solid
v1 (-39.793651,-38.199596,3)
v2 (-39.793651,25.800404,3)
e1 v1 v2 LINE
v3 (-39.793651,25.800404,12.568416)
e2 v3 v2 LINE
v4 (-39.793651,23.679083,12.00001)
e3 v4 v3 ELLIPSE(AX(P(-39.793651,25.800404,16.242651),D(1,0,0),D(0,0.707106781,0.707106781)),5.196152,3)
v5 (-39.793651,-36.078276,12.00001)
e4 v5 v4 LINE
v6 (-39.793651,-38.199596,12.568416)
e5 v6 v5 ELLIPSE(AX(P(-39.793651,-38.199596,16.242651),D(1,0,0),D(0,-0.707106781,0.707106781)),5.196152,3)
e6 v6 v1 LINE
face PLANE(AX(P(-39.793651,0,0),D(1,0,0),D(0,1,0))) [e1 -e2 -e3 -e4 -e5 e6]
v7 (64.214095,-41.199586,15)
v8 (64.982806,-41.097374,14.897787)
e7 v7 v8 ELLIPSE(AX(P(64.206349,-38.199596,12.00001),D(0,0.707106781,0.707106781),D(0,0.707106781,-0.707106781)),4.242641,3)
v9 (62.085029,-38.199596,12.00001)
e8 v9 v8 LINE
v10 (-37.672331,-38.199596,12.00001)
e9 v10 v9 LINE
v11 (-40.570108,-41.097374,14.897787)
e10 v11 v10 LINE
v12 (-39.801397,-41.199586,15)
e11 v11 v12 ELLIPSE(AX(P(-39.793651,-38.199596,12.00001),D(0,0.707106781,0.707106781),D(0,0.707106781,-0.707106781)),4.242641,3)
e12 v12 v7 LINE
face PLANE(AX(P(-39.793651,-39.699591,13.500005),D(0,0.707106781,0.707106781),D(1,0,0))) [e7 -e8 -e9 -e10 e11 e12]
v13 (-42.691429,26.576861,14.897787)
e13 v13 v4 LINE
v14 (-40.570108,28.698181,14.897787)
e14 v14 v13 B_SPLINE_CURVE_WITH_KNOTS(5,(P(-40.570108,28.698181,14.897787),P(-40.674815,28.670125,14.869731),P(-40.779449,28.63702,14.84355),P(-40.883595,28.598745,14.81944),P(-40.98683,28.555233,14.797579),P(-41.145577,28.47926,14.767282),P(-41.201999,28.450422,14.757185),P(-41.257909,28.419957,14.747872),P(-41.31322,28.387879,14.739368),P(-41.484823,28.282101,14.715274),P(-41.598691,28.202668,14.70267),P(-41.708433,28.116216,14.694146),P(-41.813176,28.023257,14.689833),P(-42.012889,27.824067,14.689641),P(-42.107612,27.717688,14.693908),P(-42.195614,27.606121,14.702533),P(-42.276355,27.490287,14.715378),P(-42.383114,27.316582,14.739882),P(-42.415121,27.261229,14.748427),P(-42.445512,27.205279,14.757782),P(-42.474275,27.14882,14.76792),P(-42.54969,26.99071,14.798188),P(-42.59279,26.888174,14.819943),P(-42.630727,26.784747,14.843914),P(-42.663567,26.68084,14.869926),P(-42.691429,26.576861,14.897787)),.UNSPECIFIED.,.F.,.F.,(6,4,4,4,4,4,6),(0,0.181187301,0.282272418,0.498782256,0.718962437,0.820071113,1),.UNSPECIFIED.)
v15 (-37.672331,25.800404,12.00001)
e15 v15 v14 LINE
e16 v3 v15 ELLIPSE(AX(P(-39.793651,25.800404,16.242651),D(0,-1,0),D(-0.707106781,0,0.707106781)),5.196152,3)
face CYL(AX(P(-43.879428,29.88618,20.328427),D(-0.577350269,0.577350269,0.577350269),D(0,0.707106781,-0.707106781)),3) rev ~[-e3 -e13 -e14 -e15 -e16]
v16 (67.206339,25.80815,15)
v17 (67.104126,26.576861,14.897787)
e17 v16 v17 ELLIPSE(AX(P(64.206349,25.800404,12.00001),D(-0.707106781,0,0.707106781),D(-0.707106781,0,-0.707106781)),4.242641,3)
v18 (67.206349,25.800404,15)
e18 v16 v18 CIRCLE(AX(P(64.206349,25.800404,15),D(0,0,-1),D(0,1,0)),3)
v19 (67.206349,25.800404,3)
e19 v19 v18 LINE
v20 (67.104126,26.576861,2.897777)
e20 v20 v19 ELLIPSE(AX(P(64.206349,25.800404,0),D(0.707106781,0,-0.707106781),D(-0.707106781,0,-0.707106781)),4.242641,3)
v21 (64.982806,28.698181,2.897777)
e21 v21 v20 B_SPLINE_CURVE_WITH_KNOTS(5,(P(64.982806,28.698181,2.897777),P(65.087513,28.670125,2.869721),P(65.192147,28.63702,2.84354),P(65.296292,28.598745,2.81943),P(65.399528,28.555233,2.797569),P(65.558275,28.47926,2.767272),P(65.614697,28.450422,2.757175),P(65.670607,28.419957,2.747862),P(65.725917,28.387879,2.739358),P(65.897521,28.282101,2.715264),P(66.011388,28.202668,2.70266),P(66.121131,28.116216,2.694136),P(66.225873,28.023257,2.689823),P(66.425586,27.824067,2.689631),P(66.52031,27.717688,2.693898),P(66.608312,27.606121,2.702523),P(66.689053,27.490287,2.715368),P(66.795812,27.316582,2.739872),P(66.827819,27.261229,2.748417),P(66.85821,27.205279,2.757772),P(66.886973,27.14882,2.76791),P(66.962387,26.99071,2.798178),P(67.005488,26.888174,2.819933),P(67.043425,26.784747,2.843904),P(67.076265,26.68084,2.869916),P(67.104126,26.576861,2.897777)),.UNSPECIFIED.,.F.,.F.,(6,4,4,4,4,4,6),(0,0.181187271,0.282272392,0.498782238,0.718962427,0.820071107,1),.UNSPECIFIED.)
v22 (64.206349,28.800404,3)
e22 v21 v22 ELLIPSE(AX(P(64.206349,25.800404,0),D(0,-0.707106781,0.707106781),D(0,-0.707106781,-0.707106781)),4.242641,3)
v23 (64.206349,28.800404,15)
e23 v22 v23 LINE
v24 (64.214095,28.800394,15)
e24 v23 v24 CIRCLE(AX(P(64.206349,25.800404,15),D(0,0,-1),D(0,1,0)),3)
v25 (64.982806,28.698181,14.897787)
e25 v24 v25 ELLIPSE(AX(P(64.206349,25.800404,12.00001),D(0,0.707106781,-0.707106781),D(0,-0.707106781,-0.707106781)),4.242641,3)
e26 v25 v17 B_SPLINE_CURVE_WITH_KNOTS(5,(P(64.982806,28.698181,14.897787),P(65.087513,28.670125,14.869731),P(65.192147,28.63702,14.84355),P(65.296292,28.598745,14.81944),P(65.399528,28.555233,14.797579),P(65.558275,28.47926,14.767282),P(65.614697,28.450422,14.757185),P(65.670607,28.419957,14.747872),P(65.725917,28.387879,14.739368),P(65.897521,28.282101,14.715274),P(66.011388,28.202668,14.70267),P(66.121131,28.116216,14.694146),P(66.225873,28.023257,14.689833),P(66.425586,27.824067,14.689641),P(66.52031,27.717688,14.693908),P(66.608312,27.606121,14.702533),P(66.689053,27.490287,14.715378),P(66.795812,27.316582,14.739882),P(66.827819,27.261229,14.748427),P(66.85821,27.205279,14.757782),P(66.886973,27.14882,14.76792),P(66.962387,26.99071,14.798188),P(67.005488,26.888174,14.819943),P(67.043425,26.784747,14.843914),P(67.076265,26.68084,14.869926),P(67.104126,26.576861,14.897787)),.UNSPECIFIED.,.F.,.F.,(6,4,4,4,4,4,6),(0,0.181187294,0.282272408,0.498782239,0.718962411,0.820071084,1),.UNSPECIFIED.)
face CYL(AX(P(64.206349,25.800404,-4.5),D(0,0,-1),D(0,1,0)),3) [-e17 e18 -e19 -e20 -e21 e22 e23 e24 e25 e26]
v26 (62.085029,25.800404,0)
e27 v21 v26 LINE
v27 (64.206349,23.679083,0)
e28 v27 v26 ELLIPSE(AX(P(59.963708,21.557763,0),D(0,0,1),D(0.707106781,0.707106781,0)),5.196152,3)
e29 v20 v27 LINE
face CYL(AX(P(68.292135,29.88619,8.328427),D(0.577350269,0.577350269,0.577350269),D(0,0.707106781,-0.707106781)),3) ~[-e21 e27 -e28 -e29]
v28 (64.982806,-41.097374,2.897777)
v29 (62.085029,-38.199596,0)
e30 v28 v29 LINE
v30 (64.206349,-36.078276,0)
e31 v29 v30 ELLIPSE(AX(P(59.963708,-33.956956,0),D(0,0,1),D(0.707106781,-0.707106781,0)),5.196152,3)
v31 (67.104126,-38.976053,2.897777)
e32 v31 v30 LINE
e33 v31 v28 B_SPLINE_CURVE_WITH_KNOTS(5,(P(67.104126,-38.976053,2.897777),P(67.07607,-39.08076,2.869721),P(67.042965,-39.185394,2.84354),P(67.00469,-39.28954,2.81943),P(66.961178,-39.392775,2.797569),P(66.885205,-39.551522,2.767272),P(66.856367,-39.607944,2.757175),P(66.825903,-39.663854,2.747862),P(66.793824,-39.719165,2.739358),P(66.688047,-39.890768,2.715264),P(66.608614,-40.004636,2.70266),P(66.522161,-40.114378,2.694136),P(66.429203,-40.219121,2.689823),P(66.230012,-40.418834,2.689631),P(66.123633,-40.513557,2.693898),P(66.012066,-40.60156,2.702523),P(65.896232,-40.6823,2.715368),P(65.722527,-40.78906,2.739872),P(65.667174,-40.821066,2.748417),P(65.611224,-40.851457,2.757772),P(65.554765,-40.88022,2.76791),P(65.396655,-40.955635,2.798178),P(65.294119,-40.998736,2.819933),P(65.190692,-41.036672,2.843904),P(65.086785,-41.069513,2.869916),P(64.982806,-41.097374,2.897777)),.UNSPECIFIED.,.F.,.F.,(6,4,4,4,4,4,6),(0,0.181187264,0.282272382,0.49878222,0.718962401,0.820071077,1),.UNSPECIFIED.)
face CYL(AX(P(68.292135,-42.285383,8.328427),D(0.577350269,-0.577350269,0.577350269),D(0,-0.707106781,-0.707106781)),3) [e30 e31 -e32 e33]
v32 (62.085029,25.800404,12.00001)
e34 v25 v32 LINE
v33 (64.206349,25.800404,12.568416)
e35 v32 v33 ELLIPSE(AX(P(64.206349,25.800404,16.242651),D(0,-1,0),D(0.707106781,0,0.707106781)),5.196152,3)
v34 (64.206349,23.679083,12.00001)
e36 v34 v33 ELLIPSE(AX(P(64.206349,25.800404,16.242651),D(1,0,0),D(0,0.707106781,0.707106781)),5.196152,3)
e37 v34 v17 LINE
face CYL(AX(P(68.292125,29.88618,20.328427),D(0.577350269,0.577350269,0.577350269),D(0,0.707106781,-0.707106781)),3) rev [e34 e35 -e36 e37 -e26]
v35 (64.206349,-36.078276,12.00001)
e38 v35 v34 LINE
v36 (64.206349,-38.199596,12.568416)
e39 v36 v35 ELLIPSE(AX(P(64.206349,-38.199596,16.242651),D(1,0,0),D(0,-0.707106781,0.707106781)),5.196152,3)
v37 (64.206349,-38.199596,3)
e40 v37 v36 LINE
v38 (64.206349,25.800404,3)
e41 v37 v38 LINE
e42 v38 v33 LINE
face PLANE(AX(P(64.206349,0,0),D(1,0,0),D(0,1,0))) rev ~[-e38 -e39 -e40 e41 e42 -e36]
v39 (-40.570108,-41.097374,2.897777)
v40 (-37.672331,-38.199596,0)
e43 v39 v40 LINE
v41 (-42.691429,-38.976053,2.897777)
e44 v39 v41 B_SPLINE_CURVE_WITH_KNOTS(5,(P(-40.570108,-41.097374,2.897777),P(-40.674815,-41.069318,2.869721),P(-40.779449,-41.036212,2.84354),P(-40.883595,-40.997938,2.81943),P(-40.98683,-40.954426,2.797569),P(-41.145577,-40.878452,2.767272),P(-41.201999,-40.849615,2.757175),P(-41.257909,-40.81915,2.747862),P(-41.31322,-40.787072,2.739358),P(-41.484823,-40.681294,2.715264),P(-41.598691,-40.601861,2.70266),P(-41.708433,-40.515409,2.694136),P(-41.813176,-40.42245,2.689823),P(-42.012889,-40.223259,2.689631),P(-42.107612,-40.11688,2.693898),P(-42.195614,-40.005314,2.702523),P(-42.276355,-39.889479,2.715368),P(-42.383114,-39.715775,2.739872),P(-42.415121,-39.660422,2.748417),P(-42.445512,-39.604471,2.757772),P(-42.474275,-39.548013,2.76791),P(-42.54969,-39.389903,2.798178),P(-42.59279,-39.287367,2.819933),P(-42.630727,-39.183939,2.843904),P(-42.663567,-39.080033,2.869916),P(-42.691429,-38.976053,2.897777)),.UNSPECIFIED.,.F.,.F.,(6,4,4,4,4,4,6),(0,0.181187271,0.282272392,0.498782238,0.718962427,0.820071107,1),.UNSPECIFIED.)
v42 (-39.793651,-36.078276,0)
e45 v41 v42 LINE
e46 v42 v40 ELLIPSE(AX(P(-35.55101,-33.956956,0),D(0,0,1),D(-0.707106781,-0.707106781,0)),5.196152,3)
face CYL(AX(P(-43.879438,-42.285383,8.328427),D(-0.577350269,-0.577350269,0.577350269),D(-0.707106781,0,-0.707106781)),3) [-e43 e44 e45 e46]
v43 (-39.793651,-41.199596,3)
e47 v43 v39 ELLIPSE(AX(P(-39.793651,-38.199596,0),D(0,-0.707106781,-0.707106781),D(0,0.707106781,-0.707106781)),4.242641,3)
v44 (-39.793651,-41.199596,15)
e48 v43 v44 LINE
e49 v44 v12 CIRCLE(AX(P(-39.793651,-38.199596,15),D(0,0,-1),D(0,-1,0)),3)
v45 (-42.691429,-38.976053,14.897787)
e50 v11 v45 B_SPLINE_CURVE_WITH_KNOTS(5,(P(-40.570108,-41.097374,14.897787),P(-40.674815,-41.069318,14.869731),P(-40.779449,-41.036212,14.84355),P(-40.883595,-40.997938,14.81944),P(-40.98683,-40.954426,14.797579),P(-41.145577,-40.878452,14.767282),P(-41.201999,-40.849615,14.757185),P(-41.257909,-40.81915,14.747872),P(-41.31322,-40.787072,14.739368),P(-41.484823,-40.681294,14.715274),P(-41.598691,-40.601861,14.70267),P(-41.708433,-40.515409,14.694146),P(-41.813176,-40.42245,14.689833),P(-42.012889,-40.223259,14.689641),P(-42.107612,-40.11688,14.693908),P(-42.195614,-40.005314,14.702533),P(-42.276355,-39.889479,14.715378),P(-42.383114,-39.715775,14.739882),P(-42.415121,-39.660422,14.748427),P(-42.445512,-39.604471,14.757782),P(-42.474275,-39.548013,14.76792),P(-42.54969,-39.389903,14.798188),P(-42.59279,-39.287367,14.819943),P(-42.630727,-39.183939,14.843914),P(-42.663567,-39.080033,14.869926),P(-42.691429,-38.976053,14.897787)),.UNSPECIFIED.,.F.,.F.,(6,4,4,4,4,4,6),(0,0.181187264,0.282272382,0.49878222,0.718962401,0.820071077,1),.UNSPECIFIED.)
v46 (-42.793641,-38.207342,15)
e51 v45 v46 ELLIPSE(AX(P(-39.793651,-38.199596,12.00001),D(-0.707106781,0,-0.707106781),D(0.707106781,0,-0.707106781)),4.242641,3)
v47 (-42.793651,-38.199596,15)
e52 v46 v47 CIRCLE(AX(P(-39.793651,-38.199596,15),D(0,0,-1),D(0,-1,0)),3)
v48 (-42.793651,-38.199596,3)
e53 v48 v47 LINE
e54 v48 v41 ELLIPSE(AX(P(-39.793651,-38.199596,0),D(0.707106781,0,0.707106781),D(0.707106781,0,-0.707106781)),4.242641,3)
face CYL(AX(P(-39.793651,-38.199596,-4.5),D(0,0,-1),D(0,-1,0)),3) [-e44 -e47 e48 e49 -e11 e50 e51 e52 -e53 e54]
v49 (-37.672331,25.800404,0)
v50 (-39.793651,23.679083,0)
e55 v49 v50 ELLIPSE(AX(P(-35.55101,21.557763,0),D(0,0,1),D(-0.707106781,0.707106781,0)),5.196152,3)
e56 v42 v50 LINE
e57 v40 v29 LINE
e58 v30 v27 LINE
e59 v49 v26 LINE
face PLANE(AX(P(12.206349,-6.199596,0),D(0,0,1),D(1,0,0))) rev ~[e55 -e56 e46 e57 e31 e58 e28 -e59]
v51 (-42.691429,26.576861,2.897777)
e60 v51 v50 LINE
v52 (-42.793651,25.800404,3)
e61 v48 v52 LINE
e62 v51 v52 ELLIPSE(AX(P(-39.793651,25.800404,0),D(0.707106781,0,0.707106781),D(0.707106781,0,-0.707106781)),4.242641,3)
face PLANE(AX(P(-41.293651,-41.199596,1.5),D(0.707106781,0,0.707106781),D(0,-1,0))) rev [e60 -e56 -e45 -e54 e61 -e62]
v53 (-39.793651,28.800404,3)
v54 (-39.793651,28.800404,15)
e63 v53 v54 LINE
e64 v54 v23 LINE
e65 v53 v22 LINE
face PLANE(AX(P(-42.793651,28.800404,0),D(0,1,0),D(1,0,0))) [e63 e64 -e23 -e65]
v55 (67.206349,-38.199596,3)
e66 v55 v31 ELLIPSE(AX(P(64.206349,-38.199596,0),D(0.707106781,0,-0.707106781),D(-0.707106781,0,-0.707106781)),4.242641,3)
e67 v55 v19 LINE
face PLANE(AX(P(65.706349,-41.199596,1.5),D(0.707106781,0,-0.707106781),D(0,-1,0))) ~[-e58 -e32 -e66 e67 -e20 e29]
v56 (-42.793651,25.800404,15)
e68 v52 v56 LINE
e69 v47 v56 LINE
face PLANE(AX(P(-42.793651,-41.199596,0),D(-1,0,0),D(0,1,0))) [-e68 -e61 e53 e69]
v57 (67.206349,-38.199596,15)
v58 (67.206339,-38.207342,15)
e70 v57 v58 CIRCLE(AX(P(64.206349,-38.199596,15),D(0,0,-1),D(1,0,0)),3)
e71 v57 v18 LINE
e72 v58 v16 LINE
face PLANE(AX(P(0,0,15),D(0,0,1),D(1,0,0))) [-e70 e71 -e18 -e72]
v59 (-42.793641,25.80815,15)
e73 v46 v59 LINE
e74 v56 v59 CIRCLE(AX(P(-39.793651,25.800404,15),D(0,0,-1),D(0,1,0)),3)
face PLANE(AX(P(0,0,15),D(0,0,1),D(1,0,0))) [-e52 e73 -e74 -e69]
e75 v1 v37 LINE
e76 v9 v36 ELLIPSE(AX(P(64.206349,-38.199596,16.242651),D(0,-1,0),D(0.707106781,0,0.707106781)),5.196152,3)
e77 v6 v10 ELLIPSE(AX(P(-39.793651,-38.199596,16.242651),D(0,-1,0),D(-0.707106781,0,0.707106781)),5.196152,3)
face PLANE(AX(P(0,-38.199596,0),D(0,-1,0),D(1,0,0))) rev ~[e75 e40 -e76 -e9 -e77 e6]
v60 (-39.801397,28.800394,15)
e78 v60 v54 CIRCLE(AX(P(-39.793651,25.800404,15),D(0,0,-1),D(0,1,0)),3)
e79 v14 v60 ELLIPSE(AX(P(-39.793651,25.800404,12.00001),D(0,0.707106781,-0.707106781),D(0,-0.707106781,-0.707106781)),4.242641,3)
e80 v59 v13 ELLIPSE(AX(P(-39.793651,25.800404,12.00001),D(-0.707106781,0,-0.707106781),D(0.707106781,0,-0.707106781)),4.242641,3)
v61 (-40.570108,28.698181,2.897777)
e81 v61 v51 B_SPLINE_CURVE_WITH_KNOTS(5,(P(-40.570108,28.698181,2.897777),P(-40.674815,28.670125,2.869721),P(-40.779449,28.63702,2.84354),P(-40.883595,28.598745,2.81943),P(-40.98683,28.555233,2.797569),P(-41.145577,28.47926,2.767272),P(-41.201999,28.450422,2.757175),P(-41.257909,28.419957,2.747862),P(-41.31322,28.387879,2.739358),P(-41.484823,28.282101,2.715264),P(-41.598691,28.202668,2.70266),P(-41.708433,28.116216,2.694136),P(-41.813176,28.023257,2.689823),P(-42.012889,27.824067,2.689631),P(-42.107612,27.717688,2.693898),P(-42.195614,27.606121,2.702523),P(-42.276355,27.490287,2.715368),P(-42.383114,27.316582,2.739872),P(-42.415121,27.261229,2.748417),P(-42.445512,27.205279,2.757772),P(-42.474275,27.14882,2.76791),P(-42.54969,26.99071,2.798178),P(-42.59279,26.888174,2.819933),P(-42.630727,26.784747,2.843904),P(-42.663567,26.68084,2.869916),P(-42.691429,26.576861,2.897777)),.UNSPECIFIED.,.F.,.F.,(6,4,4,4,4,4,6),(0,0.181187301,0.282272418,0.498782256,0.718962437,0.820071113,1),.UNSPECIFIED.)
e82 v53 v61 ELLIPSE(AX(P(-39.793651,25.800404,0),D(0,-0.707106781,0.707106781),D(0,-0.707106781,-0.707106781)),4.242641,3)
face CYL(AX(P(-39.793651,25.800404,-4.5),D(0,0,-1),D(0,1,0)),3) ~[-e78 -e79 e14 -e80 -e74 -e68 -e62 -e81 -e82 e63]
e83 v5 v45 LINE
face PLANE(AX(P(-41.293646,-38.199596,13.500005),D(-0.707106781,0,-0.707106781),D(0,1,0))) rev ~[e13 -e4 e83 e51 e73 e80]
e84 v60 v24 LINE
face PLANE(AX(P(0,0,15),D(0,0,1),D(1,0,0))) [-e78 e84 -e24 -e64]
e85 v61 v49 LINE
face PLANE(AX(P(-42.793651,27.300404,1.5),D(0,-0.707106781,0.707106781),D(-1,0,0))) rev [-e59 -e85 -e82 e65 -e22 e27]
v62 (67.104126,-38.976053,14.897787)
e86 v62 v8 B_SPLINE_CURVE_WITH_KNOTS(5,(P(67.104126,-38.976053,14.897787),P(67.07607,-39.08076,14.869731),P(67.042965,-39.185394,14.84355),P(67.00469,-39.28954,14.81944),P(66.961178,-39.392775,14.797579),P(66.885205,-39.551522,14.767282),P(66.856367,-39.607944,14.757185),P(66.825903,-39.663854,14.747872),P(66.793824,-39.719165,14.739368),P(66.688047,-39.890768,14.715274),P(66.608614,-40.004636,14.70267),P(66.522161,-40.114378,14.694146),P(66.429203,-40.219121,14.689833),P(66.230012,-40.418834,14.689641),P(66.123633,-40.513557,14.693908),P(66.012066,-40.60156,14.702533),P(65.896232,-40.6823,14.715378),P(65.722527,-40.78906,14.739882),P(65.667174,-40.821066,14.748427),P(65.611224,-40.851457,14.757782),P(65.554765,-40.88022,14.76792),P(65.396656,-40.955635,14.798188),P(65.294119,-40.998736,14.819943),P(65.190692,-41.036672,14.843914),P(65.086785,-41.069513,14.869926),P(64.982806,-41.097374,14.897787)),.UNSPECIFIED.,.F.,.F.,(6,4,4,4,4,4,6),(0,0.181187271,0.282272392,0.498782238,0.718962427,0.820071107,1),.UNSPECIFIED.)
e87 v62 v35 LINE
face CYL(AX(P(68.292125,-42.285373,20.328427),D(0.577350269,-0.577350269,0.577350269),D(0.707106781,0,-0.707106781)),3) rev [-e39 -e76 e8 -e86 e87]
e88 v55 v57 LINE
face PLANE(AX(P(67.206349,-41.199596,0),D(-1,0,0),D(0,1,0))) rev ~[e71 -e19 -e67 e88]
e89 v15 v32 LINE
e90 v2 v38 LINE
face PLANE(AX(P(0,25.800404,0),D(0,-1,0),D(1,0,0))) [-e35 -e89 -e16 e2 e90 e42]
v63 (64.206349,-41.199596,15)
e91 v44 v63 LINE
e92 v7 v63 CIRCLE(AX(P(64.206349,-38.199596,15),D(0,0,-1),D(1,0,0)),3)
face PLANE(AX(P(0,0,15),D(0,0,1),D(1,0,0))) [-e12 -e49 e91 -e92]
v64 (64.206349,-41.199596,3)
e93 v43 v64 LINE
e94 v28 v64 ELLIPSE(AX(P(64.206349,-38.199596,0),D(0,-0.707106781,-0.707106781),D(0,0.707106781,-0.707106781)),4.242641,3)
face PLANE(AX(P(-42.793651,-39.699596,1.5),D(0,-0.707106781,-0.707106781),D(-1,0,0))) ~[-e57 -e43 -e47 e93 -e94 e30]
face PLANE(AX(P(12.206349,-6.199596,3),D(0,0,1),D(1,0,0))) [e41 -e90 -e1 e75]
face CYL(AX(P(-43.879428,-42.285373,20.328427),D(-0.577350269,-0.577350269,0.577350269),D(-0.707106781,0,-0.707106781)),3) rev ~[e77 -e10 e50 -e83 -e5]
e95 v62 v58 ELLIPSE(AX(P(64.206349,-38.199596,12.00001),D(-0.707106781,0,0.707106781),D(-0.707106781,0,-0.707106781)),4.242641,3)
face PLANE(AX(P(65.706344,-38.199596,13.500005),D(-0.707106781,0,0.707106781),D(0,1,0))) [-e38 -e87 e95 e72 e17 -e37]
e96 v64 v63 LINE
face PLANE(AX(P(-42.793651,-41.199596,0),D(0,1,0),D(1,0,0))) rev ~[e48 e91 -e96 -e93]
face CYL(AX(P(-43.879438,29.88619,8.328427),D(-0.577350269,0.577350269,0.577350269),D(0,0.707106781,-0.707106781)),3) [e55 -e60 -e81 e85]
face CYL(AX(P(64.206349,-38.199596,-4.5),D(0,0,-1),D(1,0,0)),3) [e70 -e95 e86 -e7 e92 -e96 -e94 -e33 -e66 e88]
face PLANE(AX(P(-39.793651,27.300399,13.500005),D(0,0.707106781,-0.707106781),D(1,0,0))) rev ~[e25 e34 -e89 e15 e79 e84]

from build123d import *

# Parameters (mm, degrees)
F0_W         = 110
F0_H         = 70
F1_DEPTH     = 15
F2_T         = -3
F3_SIZE      = 3
F4_SIZE      = 2.99999
F5_T4_DEPTH  = 13.85638914
F5_T11_DEPTH = 13.85638914
F5_T17_DEPTH = 13.85638914
F5_T23_DEPTH = 13.85638914
F5_T30_DEPTH = 13.85638914
F5_T36_DEPTH = 13.85638914
F5_T42_DEPTH = 13.85638914
F5_T49_DEPTH = 13.85638914
F5_T55_DEPTH = 13.85638914
F5_T61_DEPTH = 13.85638914
F5_T68_DEPTH = 13.85638914
F5_T74_DEPTH = 13.85638914
F5_T77_DEPTH = 27
F5_T79_DEPTH = 13.8564064606
F5_T81_DEPTH = 13.8564064606
F5_T83_DEPTH = 13.8564064606
F5_T85_DEPTH = 13.8564064606


# Not quite as in the source:
# - a fillet or chamfer that OpenCascade refuses, or shapes differently, is made with other operations: its cross-section is extruded or revolved along the edge and cut away or added
# - a fillet or chamfer is up to 0.001 mm smaller than in the source, because OpenCascade refuses the exact size


with BuildPart() as f1:
    # F0 (on Top) → F1 (new body)
    with BuildSketch(Plane.XY):
        with Locations((12.2063489258, -6.1995962761)):
            Rectangle(F0_W, F0_H)
    extrude(amount=F1_DEPTH)

    # F2
    f2_openings = [f1.faces().sort_by_distance(p)[0] for p in [
        (12.206349, -6.199596, 15),
    ]]
    offset(amount=F2_T, openings=f2_openings)

    # F3
    f3_edges = [f1.edges().sort_by_distance(p)[0] for p in [
        (-42.793651, -6.199596, 0),
        (12.206349, -41.199596, 0),
        (67.206349, -6.199596, 0),
        (12.206349, 28.800404, 0),
    ]]
    chamfer(f3_edges, length=F3_SIZE)

    # F4 (size 3 in the source; OpenCascade refuses exactly that, so slightly less here)
    f4_edges = [f1.edges().sort_by_distance(p)[0] for p in [
        (12.206349, 25.800404, 15),
        (-39.793651, -6.199596, 15),
        (64.206349, -6.199596, 15),
        (12.206349, -38.199596, 15),
    ]]
    chamfer(f4_edges, length=F4_SIZE)

    # F5: fillet of radius 3 on 12 edges, made by hand


with BuildPart() as f5_tool2:
    # F5_s3 → F5_t4 (new body)
    with BuildSketch(Plane(origin=(43.6353084006, -43.6353084006, 43.6353084006), x_dir=(-0.7071067812, -0.7071067812, 0), z_dir=(-0.5773502692, 0.5773502692, -0.5773502692))):
        with BuildLine():
            ThreePointArc((-19.8895511553, -31.1430595221), (-18.3895511553, -31.5449833108), (-16.8895511553, -31.1430595221))
            Line((-16.8895511553, -31.1430595221), (-18.3895511553, -32.0090849259))
            Line((-18.3895511553, -32.0090849259), (-19.8895511553, -31.1430595221))
        make_face()
    extrude(amount=F5_T4_DEPTH)

    split(bisect_by=Plane.XY.offset(15), keep=Keep.BOTTOM)

    split(bisect_by=Plane.YZ.offset(64.2063489258), keep=Keep.TOP)

    split(bisect_by=Plane.XZ.offset(38.1995962761), keep=Keep.TOP)


with BuildPart() as f1_1:
    add(f1.part)

    # F5_t1: union F5_tool2
    add(f5_tool2.part)


with BuildPart() as f5_tool9:
    # F5_s10 → F5_t11 (new body)
    with BuildSketch(Plane(origin=(43.6353084006, -43.6353084006, 43.6353084006), x_dir=(-0.7071067812, -0.7071067812, 0), z_dir=(-0.5773502692, 0.5773502692, -0.5773502692))):
        with BuildLine():
            ThreePointArc((-19.8895511553, -31.1430595221), (-18.3895511553, -31.5449833108), (-16.8895511553, -31.1430595221))
            Line((-16.8895511553, -31.1430595221), (-18.3895511553, -32.0090849259))
            Line((-18.3895511553, -32.0090849259), (-19.8895511553, -31.1430595221))
        make_face()
    extrude(amount=F5_T11_DEPTH)

    split(bisect_by=Plane.YZ.offset(64.2063489258), keep=Keep.BOTTOM)

    split(bisect_by=Plane.XZ.offset(38.1995962761), keep=Keep.TOP)


with BuildPart() as f1_2:
    add(f1_1.part)

    # F5_t8: union F5_tool9
    add(f5_tool9.part)


with BuildPart() as f5_tool15:
    # F5_s16 → F5_t17 (new body)
    with BuildSketch(Plane(origin=(43.6353084006, -43.6353084006, 43.6353084006), x_dir=(-0.7071067812, -0.7071067812, 0), z_dir=(-0.5773502692, 0.5773502692, -0.5773502692))):
        with BuildLine():
            ThreePointArc((-19.8895511553, -31.1430595221), (-18.3895511553, -31.5449833108), (-16.8895511553, -31.1430595221))
            Line((-16.8895511553, -31.1430595221), (-18.3895511553, -32.0090849259))
            Line((-18.3895511553, -32.0090849259), (-19.8895511553, -31.1430595221))
        make_face()
    extrude(amount=F5_T17_DEPTH)

    split(bisect_by=Plane.YZ.offset(64.2063489258), keep=Keep.TOP)

    split(bisect_by=Plane.XZ.offset(38.1995962761), keep=Keep.BOTTOM)


with BuildPart() as f1_3:
    add(f1_2.part)

    # F5_t14: union F5_tool15
    add(f5_tool15.part)


with BuildPart() as f5_tool21:
    # F5_s22 → F5_t23 (new body)
    with BuildSketch(Plane(origin=(-35.4977424501, -35.4977424501, 35.4977424501), x_dir=(-0.7071067812, 0.7071067812, 0), z_dir=(0.5773502692, 0.5773502692, -0.5773502692))):
        with BuildLine():
            ThreePointArc((2.6271669573, -21.1766173586), (1.1271669573, -21.5785411472), (-0.3728330427, -21.1766173586))
            Line((-0.3728330427, -21.1766173586), (1.1271669573, -22.0426427624))
            Line((1.1271669573, -22.0426427624), (2.6271669573, -21.1766173586))
        make_face()
    extrude(amount=F5_T23_DEPTH)

    split(bisect_by=Plane.XY.offset(15), keep=Keep.BOTTOM)

    split(bisect_by=Plane.YZ.offset(-39.7936510742), keep=Keep.BOTTOM)

    split(bisect_by=Plane.XZ.offset(38.1995962761), keep=Keep.TOP)


with BuildPart() as f1_4:
    add(f1_3.part)

    # F5_t20: union F5_tool21
    add(f5_tool21.part)


with BuildPart() as f5_tool28:
    # F5_s29 → F5_t30 (new body)
    with BuildSketch(Plane(origin=(-35.4977424501, -35.4977424501, 35.4977424501), x_dir=(-0.7071067812, 0.7071067812, 0), z_dir=(0.5773502692, 0.5773502692, -0.5773502692))):
        with BuildLine():
            ThreePointArc((2.6271669573, -21.1766173586), (1.1271669573, -21.5785411472), (-0.3728330427, -21.1766173586))
            Line((-0.3728330427, -21.1766173586), (1.1271669573, -22.0426427624))
            Line((1.1271669573, -22.0426427624), (2.6271669573, -21.1766173586))
        make_face()
    extrude(amount=F5_T30_DEPTH)

    split(bisect_by=Plane.YZ.offset(-39.7936510742), keep=Keep.TOP)

    split(bisect_by=Plane.XZ.offset(38.1995962761), keep=Keep.TOP)


with BuildPart() as f1_5:
    add(f1_4.part)

    # F5_t27: union F5_tool28
    add(f5_tool28.part)


with BuildPart() as f5_tool34:
    # F5_s35 → F5_t36 (new body)
    with BuildSketch(Plane(origin=(-35.4977424501, -35.4977424501, 35.4977424501), x_dir=(-0.7071067812, 0.7071067812, 0), z_dir=(0.5773502692, 0.5773502692, -0.5773502692))):
        with BuildLine():
            ThreePointArc((2.6271669573, -21.1766173586), (1.1271669573, -21.5785411472), (-0.3728330427, -21.1766173586))
            Line((-0.3728330427, -21.1766173586), (1.1271669573, -22.0426427624))
            Line((1.1271669573, -22.0426427624), (2.6271669573, -21.1766173586))
        make_face()
    extrude(amount=F5_T36_DEPTH)

    split(bisect_by=Plane.YZ.offset(-39.7936510742), keep=Keep.BOTTOM)

    split(bisect_by=Plane.XZ.offset(38.1995962761), keep=Keep.BOTTOM)


with BuildPart() as f1_6:
    add(f1_5.part)

    # F5_t33: union F5_tool34
    add(f5_tool34.part)


with BuildPart() as f5_tool40:
    # F5_s41 → F5_t42 (new body)
    with BuildSketch(Plane(origin=(-31.364678266, 31.364678266, 31.364678266), x_dir=(0.7071067812, 0.7071067812, 0), z_dir=(0.5773502692, -0.5773502692, -0.5773502692))):
        with BuildLine():
            ThreePointArc((-8.3947200922, -16.114668196), (-9.8947200922, -16.5165919847), (-11.3947200922, -16.114668196))
            Line((-11.3947200922, -16.114668196), (-9.8947200922, -16.9806935998))
            Line((-9.8947200922, -16.9806935998), (-8.3947200922, -16.114668196))
        make_face()
    extrude(amount=F5_T42_DEPTH)

    split(bisect_by=Plane.XY.offset(15), keep=Keep.BOTTOM)

    split(bisect_by=Plane.XZ.offset(-25.8004037239), keep=Keep.BOTTOM)

    split(bisect_by=Plane.YZ.offset(-39.7936510742), keep=Keep.BOTTOM)


with BuildPart() as f1_7:
    add(f1_6.part)

    # F5_t39: union F5_tool40
    add(f5_tool40.part)


with BuildPart() as f5_tool47:
    # F5_s48 → F5_t49 (new body)
    with BuildSketch(Plane(origin=(-31.364678266, 31.364678266, 31.364678266), x_dir=(0.7071067812, 0.7071067812, 0), z_dir=(0.5773502692, -0.5773502692, -0.5773502692))):
        with BuildLine():
            ThreePointArc((-8.3947200922, -16.114668196), (-9.8947200922, -16.5165919847), (-11.3947200922, -16.114668196))
            Line((-11.3947200922, -16.114668196), (-9.8947200922, -16.9806935998))
            Line((-9.8947200922, -16.9806935998), (-8.3947200922, -16.114668196))
        make_face()
    extrude(amount=F5_T49_DEPTH)

    split(bisect_by=Plane.XZ.offset(-25.8004037239), keep=Keep.TOP)

    split(bisect_by=Plane.YZ.offset(-39.7936510742), keep=Keep.BOTTOM)


with BuildPart() as f1_8:
    add(f1_7.part)

    # F5_t46: union F5_tool47
    add(f5_tool47.part)


with BuildPart() as f5_tool53:
    # F5_s54 → F5_t55 (new body)
    with BuildSketch(Plane(origin=(-31.364678266, 31.364678266, 31.364678266), x_dir=(0.7071067812, 0.7071067812, 0), z_dir=(0.5773502692, -0.5773502692, -0.5773502692))):
        with BuildLine():
            ThreePointArc((-8.3947200922, -16.114668196), (-9.8947200922, -16.5165919847), (-11.3947200922, -16.114668196))
            Line((-11.3947200922, -16.114668196), (-9.8947200922, -16.9806935998))
            Line((-9.8947200922, -16.9806935998), (-8.3947200922, -16.114668196))
        make_face()
    extrude(amount=F5_T55_DEPTH)

    split(bisect_by=Plane.XZ.offset(-25.8004037239), keep=Keep.BOTTOM)

    split(bisect_by=Plane.YZ.offset(-39.7936510742), keep=Keep.TOP)


with BuildPart() as f1_9:
    add(f1_8.part)

    # F5_t52: union F5_tool53
    add(f5_tool53.part)


with BuildPart() as f5_tool59:
    # F5_s60 → F5_t61 (new body)
    with BuildSketch(Plane(origin=(39.5022442166, 39.5022442166, 39.5022442166), x_dir=(0.7071067812, -0.7071067812, 0), z_dir=(-0.5773502692, -0.5773502692, -0.5773502692))):
        with BuildLine():
            ThreePointArc((25.6571042902, -26.0811103596), (27.1571042902, -26.4830341482), (28.6571042902, -26.0811103596))
            Line((28.6571042902, -26.0811103596), (27.1571042902, -26.9471357634))
            Line((27.1571042902, -26.9471357634), (25.6571042902, -26.0811103596))
        make_face()
    extrude(amount=F5_T61_DEPTH)

    split(bisect_by=Plane.XY.offset(15), keep=Keep.BOTTOM)

    split(bisect_by=Plane.XZ.offset(-25.8004037239), keep=Keep.BOTTOM)

    split(bisect_by=Plane.YZ.offset(64.2063489258), keep=Keep.TOP)


with BuildPart() as f1_10:
    add(f1_9.part)

    # F5_t58: union F5_tool59
    add(f5_tool59.part)


with BuildPart() as f5_tool66:
    # F5_s67 → F5_t68 (new body)
    with BuildSketch(Plane(origin=(39.5022442166, 39.5022442166, 39.5022442166), x_dir=(0.7071067812, -0.7071067812, 0), z_dir=(-0.5773502692, -0.5773502692, -0.5773502692))):
        with BuildLine():
            ThreePointArc((25.6571042902, -26.0811103596), (27.1571042902, -26.4830341482), (28.6571042902, -26.0811103596))
            Line((28.6571042902, -26.0811103596), (27.1571042902, -26.9471357634))
            Line((27.1571042902, -26.9471357634), (25.6571042902, -26.0811103596))
        make_face()
    extrude(amount=F5_T68_DEPTH)

    split(bisect_by=Plane.XZ.offset(-25.8004037239), keep=Keep.TOP)

    split(bisect_by=Plane.YZ.offset(64.2063489258), keep=Keep.TOP)


with BuildPart() as f1_11:
    add(f1_10.part)

    # F5_t65: union F5_tool66
    add(f5_tool66.part)


with BuildPart() as f5_tool72:
    # F5_s73 → F5_t74 (new body)
    with BuildSketch(Plane(origin=(39.5022442166, 39.5022442166, 39.5022442166), x_dir=(0.7071067812, -0.7071067812, 0), z_dir=(-0.5773502692, -0.5773502692, -0.5773502692))):
        with BuildLine():
            ThreePointArc((25.6571042902, -26.0811103596), (27.1571042902, -26.4830341482), (28.6571042902, -26.0811103596))
            Line((28.6571042902, -26.0811103596), (27.1571042902, -26.9471357634))
            Line((27.1571042902, -26.9471357634), (25.6571042902, -26.0811103596))
        make_face()
    extrude(amount=F5_T74_DEPTH)

    split(bisect_by=Plane.XZ.offset(-25.8004037239), keep=Keep.BOTTOM)

    split(bisect_by=Plane.YZ.offset(64.2063489258), keep=Keep.BOTTOM)


with BuildPart() as f1_12:
    add(f1_11.part)

    # F5_t71: union F5_tool72
    add(f5_tool72.part)

    # F5_s78 → F5_t77 (cut)
    with BuildSketch(Plane.XY.offset(-4.5)):
        with BuildLine():
            ThreePointArc((67.2063489258, -38.1995962761), (66.3276692694, -40.3209166197), (64.2063489258, -41.1995962761))
            Line((64.2063489258, -41.1995962761), (67.2063489258, -41.1995962761))
            Line((67.2063489258, -41.1995962761), (67.2063489258, -38.1995962761))
        make_face()
        with BuildLine():
            ThreePointArc((-39.7936510742, -41.1995962761), (-41.9149714177, -40.3209166197), (-42.7936510742, -38.1995962761))
            Line((-42.7936510742, -38.1995962761), (-42.7936510742, -41.1995962761))
            Line((-42.7936510742, -41.1995962761), (-39.7936510742, -41.1995962761))
        make_face()
        with BuildLine():
            ThreePointArc((64.2063489258, 28.8004037239), (66.3276692694, 27.9217240674), (67.2063489258, 25.8004037239))
            Line((67.2063489258, 25.8004037239), (67.2063489258, 28.8004037239))
            Line((67.2063489258, 28.8004037239), (64.2063489258, 28.8004037239))
        make_face()
        with BuildLine():
            ThreePointArc((-39.7936510742, 28.8004037239), (-41.9149714177, 27.9217240674), (-42.7936510742, 25.8004037239))
            Line((-42.7936510742, 25.8004037239), (-42.7936510742, 28.8004037239))
            Line((-42.7936510742, 28.8004037239), (-39.7936510742, 28.8004037239))
        make_face()
    extrude(amount=F5_T77_DEPTH, mode=Mode.SUBTRACT)

    # F5_s80 → F5_t79 (cut)
    with BuildSketch(Plane(origin=(-31.4977491168, -31.4977491168, 31.4977491168), x_dir=(-0.7071067812, 0.7071067812, 0), z_dir=(0.5773502692, 0.5773502692, -0.5773502692))):
        with BuildLine():
            ThreePointArc((2.6271669573, -30.9745844947), (1.1271669573, -31.3765082833), (-0.3728330427, -30.9745844947))
            Line((-0.3728330427, -30.9745844947), (1.1271669573, -31.8406098985))
            Line((1.1271669573, -31.8406098985), (2.6271669573, -30.9745844947))
        make_face()
    extrude(amount=F5_T79_DEPTH, mode=Mode.SUBTRACT)

    # F5_s82 → F5_t81 (cut)
    with BuildSketch(Plane(origin=(-27.3646849327, 27.3646849327, 27.3646849327), x_dir=(0.7071067812, 0.7071067812, 0), z_dir=(0.5773502692, -0.5773502692, -0.5773502692))):
        with BuildLine():
            ThreePointArc((-8.3947200922, -25.9126353321), (-9.8947200922, -26.3145591208), (-11.3947200922, -25.9126353321))
            Line((-11.3947200922, -25.9126353321), (-9.8947200922, -26.7786607359))
            Line((-9.8947200922, -26.7786607359), (-8.3947200922, -25.9126353321))
        make_face()
    extrude(amount=F5_T81_DEPTH, mode=Mode.SUBTRACT)

    # F5_s84 → F5_t83 (cut)
    with BuildSketch(Plane(origin=(39.6353150673, -39.6353150673, 39.6353150673), x_dir=(-0.7071067812, -0.7071067812, 0), z_dir=(-0.5773502692, 0.5773502692, -0.5773502692))):
        with BuildLine():
            ThreePointArc((-16.8895511553, -40.9410266582), (-18.3895511553, -41.3429504469), (-19.8895511553, -40.9410266582))
            Line((-19.8895511553, -40.9410266582), (-18.3895511553, -41.807052062))
            Line((-18.3895511553, -41.807052062), (-16.8895511553, -40.9410266582))
        make_face()
    extrude(amount=F5_T83_DEPTH, mode=Mode.SUBTRACT)

    # F5_s86 → F5_t85 (cut)
    with BuildSketch(Plane(origin=(35.5022508832, 35.5022508832, 35.5022508832), x_dir=(0.7071067812, -0.7071067812, 0), z_dir=(-0.5773502692, -0.5773502692, -0.5773502692))):
        with BuildLine():
            ThreePointArc((25.6571042902, -35.8790774957), (27.1571042902, -36.2810012843), (28.6571042902, -35.8790774957))
            Line((28.6571042902, -35.8790774957), (27.1571042902, -36.7451028995))
            Line((27.1571042902, -36.7451028995), (25.6571042902, -35.8790774957))
        make_face()
    extrude(amount=F5_T85_DEPTH, mode=Mode.SUBTRACT)


solid = f1_12.part
